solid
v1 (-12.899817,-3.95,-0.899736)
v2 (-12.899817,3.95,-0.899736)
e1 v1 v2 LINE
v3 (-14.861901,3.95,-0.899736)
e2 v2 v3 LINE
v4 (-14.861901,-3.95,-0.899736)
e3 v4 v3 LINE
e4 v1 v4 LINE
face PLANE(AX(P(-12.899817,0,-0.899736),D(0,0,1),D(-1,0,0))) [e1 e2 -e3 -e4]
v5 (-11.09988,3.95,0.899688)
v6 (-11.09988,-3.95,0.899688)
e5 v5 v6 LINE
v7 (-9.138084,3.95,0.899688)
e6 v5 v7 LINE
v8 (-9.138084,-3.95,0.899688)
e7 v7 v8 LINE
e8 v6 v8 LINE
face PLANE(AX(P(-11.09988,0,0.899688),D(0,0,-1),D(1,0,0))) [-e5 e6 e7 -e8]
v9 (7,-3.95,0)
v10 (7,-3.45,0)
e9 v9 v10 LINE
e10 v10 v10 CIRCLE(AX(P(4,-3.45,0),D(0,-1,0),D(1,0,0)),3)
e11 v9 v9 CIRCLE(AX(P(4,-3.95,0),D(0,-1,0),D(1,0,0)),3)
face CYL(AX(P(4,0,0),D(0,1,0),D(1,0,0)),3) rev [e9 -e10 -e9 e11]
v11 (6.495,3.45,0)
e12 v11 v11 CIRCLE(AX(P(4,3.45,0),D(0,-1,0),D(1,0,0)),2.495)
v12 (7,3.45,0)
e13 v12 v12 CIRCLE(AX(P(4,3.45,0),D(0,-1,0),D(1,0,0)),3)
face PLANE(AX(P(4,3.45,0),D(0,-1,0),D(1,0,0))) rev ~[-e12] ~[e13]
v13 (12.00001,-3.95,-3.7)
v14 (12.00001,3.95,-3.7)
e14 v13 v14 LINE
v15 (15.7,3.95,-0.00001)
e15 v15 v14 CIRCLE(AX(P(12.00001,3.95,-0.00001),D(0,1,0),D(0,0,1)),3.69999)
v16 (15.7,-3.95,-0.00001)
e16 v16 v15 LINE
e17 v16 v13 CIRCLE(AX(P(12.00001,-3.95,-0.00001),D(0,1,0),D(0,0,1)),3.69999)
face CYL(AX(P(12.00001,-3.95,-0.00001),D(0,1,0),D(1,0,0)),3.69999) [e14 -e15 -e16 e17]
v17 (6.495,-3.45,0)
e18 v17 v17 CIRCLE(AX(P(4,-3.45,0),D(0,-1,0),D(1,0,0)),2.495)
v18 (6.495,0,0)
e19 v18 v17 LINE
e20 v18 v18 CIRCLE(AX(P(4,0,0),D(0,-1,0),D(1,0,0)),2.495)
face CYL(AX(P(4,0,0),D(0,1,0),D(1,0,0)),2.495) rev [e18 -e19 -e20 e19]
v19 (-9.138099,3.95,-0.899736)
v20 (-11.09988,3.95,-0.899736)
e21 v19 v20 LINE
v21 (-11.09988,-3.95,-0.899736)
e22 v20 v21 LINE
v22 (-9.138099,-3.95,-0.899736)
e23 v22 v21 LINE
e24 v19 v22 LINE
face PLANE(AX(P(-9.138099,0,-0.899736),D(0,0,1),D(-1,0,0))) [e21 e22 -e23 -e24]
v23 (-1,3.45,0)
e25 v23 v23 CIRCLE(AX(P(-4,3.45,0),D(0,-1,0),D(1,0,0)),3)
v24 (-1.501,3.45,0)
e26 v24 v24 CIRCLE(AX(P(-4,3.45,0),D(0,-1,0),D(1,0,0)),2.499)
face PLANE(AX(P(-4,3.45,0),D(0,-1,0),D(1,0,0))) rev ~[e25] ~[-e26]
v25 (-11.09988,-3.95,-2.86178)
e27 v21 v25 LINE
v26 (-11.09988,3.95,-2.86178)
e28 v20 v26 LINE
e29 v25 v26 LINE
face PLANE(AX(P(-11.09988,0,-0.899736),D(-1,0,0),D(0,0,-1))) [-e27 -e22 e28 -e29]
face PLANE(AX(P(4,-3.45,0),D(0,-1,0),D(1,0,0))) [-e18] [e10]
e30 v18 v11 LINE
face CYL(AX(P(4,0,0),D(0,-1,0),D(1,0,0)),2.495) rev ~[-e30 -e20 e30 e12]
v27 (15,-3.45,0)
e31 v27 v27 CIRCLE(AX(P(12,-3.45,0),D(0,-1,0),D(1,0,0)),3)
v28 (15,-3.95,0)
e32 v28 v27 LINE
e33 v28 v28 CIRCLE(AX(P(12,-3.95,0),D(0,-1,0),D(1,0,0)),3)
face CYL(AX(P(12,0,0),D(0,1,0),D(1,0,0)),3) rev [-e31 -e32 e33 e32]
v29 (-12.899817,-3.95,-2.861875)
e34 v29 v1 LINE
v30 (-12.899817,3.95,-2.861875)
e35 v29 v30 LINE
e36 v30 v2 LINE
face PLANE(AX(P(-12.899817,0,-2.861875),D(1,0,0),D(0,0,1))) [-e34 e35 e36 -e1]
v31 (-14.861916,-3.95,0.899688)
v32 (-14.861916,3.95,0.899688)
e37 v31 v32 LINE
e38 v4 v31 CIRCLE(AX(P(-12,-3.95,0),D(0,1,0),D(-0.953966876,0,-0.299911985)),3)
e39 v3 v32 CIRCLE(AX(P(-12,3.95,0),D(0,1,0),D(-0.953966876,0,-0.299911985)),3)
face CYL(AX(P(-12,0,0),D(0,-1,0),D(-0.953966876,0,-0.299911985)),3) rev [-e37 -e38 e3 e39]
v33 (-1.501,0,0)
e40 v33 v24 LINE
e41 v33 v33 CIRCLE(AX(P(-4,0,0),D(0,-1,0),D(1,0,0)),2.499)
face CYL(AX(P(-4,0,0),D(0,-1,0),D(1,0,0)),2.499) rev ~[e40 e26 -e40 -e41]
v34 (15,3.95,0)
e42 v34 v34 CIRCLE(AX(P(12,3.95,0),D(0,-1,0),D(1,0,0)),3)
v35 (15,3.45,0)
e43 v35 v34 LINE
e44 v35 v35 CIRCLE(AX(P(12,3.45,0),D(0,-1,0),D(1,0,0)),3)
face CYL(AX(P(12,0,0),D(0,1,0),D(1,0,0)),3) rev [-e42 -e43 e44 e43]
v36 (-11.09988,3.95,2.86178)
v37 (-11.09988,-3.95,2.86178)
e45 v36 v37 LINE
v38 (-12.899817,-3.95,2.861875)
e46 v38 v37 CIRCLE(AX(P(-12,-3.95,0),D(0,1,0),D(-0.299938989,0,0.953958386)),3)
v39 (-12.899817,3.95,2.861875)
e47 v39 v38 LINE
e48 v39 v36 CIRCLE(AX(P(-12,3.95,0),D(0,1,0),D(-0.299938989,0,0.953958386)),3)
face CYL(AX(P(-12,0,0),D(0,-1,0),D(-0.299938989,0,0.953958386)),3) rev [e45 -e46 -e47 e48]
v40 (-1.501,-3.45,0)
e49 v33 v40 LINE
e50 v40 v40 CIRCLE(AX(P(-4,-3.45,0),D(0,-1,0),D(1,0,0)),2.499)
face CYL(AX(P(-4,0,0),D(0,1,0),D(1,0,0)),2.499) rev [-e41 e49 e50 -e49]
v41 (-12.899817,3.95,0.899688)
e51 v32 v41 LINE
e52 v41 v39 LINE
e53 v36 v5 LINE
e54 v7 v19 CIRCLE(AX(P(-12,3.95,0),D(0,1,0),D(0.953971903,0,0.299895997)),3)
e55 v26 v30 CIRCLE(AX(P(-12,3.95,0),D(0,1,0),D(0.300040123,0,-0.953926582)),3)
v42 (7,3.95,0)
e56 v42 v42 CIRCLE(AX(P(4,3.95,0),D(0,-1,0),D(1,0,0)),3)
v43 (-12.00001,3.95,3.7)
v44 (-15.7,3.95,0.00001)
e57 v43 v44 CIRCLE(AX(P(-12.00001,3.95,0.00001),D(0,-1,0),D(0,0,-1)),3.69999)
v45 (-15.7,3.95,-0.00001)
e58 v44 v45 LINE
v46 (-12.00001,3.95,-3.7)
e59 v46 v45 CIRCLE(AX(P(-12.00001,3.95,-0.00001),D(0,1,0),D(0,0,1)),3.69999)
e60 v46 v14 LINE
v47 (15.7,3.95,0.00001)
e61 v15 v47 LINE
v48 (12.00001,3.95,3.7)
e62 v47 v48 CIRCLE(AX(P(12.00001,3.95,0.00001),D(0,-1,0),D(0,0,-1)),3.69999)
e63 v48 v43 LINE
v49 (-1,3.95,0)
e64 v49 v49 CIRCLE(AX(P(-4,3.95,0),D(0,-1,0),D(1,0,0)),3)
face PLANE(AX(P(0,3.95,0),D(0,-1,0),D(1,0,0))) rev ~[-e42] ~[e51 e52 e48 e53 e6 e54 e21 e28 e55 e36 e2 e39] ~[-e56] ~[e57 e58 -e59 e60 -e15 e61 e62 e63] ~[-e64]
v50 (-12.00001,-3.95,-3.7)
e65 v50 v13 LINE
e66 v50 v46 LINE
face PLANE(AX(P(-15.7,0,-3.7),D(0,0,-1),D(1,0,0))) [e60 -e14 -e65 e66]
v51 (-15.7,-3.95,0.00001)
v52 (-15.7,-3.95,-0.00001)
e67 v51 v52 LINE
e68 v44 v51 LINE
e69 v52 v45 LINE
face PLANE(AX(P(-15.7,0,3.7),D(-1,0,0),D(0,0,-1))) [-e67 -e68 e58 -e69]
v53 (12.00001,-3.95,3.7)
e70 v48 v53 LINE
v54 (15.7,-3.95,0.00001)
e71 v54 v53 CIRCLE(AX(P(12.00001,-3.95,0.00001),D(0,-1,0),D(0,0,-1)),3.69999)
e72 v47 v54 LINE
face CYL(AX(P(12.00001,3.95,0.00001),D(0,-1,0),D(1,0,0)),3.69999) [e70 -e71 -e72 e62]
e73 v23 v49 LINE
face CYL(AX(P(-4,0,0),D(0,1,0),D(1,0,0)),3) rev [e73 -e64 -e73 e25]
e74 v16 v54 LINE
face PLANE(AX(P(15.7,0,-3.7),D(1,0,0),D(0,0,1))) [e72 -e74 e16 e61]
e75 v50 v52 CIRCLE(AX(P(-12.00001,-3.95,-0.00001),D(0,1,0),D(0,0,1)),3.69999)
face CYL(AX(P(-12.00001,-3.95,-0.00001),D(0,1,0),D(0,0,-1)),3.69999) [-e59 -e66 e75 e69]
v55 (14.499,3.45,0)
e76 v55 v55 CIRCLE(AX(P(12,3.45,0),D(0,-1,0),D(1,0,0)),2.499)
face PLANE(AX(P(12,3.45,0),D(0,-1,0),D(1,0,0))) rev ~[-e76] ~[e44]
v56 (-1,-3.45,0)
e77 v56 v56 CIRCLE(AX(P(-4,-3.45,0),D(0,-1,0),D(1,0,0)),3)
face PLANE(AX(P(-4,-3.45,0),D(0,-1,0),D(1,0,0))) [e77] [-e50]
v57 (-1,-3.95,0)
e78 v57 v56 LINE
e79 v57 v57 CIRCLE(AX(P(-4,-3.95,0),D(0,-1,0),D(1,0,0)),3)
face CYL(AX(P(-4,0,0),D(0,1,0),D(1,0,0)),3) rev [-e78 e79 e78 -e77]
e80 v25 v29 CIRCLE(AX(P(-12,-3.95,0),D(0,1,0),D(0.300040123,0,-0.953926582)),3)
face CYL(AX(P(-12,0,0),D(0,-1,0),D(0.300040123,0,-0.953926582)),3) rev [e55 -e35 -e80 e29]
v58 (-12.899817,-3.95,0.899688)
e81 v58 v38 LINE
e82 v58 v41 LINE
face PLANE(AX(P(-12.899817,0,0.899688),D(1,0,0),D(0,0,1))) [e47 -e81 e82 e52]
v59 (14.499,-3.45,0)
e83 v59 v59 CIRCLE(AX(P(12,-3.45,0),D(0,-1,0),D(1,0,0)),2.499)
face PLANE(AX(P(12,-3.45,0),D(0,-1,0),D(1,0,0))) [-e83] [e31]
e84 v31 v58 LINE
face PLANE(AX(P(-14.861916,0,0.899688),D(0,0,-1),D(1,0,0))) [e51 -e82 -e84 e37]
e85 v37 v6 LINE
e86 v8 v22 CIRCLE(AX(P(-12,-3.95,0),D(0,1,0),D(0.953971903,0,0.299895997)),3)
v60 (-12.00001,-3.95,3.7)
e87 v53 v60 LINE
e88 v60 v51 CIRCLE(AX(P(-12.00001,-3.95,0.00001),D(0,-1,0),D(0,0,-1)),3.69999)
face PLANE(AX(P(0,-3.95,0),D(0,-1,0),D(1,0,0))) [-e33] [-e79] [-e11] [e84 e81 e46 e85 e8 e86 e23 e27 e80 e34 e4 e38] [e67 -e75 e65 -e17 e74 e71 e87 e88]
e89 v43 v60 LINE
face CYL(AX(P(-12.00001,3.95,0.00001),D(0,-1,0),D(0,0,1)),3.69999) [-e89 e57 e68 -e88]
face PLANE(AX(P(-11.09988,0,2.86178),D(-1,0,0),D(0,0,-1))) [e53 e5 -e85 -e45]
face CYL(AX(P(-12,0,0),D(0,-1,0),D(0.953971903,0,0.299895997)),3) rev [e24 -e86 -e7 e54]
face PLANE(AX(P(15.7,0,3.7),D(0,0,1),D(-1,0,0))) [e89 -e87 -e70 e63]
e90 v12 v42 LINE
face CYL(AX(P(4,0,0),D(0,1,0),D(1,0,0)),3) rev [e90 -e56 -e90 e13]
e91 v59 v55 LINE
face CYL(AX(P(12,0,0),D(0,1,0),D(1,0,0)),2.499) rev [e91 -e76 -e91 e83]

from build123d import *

# Parameters (mm, degrees)
F0_R     = 3
F1_DEPTH = 3.95
F0_R_2   = 2.499
F0_R_3   = 2.495
F2_DEPTH = 3.45
F3_R     = 3.69999


# Not quite as in the source:
# - a fillet or chamfer is up to 0.001 mm smaller than in the source, because OpenCascade refuses the exact size


with BuildPart() as f1:
    # F0 (on Front) → F1 (new body, symmetric)
    with BuildSketch(Plane.XZ):
        Polygon((15.7, -3.7), (15.7, 0), (15.7, 3.7), (-15.7, 3.7), (-15.7, -3.7), align=None)
        with BuildLine():
            ThreePointArc((-12.8998169675, 2.8618751589), (-11.9998409744, 2.9999999958), (-11.0998796299, 2.8617797468))
            Line((-11.0998796299, 2.8617797468), (-11.0998796299, 0.8996879915))
            Line((-11.0998796299, 0.8996879915), (-9.1380842923, 0.8996879915))
            ThreePointArc((-9.1380842923, 0.8996879915), (-9.0000000001, -2.51387e-05), (-9.1380993707, -0.8997359546))
            Line((-9.1380993707, -0.8997359546), (-11.0998796299, -0.8997359546))
            Line((-11.0998796299, -0.8997359546), (-11.0998796299, -2.8617797468))
            ThreePointArc((-11.0998796299, -2.8617797468), (-11.9998409744, -2.9999999958), (-12.8998169675, -2.8618751589))
            Line((-12.8998169675, -2.8618751589), (-12.8998169675, -0.8997359546))
            Line((-12.8998169675, -0.8997359546), (-14.8619006293, -0.8997359546))
            ThreePointArc((-14.8619006293, -0.8997359546), (-14.9999999999, -2.51387e-05), (-14.8619157077, 0.8996879915))
            Line((-14.8619157077, 0.8996879915), (-12.8998169675, 0.8996879915))
            Line((-12.8998169675, 0.8996879915), (-12.8998169675, 2.8618751589))
        make_face(mode=Mode.SUBTRACT)
        with Locations((-4, 0)):
            Circle(F0_R, mode=Mode.SUBTRACT)
        with Locations((4, 0)):
            Circle(F0_R, mode=Mode.SUBTRACT)
        with Locations((12, 0)):
            Circle(F0_R, mode=Mode.SUBTRACT)
    extrude(amount=F1_DEPTH, both=True)

    # F0 (on Front) → F2 (join, symmetric)
    with BuildSketch(Plane.XZ):
        with Locations((-4, 0)):
            Circle(F0_R)
        with Locations((-4, 0)):
            Circle(F0_R_2, mode=Mode.SUBTRACT)
        with Locations((4, 0)):
            Circle(F0_R)
        with Locations((4, 0)):
            Circle(F0_R_3, mode=Mode.SUBTRACT)
        with Locations((12, 0)):
            Circle(F0_R)
        with Locations((12, 0)):
            Circle(F0_R_2, mode=Mode.SUBTRACT)
    extrude(amount=F2_DEPTH, both=True)

    # F3 (radius 3.7 in the source; OpenCascade refuses exactly that, so slightly less here)
    f3_edges = [f1.edges().sort_by_distance(p)[0] for p in [
        (-15.7, 0, 3.7),
        (-15.7, 0, -3.7),
        (15.7, 0, 3.7),
        (15.7, 0, -3.7),
    ]]
    fillet(f3_edges, radius=F3_R)


solid = f1.part
